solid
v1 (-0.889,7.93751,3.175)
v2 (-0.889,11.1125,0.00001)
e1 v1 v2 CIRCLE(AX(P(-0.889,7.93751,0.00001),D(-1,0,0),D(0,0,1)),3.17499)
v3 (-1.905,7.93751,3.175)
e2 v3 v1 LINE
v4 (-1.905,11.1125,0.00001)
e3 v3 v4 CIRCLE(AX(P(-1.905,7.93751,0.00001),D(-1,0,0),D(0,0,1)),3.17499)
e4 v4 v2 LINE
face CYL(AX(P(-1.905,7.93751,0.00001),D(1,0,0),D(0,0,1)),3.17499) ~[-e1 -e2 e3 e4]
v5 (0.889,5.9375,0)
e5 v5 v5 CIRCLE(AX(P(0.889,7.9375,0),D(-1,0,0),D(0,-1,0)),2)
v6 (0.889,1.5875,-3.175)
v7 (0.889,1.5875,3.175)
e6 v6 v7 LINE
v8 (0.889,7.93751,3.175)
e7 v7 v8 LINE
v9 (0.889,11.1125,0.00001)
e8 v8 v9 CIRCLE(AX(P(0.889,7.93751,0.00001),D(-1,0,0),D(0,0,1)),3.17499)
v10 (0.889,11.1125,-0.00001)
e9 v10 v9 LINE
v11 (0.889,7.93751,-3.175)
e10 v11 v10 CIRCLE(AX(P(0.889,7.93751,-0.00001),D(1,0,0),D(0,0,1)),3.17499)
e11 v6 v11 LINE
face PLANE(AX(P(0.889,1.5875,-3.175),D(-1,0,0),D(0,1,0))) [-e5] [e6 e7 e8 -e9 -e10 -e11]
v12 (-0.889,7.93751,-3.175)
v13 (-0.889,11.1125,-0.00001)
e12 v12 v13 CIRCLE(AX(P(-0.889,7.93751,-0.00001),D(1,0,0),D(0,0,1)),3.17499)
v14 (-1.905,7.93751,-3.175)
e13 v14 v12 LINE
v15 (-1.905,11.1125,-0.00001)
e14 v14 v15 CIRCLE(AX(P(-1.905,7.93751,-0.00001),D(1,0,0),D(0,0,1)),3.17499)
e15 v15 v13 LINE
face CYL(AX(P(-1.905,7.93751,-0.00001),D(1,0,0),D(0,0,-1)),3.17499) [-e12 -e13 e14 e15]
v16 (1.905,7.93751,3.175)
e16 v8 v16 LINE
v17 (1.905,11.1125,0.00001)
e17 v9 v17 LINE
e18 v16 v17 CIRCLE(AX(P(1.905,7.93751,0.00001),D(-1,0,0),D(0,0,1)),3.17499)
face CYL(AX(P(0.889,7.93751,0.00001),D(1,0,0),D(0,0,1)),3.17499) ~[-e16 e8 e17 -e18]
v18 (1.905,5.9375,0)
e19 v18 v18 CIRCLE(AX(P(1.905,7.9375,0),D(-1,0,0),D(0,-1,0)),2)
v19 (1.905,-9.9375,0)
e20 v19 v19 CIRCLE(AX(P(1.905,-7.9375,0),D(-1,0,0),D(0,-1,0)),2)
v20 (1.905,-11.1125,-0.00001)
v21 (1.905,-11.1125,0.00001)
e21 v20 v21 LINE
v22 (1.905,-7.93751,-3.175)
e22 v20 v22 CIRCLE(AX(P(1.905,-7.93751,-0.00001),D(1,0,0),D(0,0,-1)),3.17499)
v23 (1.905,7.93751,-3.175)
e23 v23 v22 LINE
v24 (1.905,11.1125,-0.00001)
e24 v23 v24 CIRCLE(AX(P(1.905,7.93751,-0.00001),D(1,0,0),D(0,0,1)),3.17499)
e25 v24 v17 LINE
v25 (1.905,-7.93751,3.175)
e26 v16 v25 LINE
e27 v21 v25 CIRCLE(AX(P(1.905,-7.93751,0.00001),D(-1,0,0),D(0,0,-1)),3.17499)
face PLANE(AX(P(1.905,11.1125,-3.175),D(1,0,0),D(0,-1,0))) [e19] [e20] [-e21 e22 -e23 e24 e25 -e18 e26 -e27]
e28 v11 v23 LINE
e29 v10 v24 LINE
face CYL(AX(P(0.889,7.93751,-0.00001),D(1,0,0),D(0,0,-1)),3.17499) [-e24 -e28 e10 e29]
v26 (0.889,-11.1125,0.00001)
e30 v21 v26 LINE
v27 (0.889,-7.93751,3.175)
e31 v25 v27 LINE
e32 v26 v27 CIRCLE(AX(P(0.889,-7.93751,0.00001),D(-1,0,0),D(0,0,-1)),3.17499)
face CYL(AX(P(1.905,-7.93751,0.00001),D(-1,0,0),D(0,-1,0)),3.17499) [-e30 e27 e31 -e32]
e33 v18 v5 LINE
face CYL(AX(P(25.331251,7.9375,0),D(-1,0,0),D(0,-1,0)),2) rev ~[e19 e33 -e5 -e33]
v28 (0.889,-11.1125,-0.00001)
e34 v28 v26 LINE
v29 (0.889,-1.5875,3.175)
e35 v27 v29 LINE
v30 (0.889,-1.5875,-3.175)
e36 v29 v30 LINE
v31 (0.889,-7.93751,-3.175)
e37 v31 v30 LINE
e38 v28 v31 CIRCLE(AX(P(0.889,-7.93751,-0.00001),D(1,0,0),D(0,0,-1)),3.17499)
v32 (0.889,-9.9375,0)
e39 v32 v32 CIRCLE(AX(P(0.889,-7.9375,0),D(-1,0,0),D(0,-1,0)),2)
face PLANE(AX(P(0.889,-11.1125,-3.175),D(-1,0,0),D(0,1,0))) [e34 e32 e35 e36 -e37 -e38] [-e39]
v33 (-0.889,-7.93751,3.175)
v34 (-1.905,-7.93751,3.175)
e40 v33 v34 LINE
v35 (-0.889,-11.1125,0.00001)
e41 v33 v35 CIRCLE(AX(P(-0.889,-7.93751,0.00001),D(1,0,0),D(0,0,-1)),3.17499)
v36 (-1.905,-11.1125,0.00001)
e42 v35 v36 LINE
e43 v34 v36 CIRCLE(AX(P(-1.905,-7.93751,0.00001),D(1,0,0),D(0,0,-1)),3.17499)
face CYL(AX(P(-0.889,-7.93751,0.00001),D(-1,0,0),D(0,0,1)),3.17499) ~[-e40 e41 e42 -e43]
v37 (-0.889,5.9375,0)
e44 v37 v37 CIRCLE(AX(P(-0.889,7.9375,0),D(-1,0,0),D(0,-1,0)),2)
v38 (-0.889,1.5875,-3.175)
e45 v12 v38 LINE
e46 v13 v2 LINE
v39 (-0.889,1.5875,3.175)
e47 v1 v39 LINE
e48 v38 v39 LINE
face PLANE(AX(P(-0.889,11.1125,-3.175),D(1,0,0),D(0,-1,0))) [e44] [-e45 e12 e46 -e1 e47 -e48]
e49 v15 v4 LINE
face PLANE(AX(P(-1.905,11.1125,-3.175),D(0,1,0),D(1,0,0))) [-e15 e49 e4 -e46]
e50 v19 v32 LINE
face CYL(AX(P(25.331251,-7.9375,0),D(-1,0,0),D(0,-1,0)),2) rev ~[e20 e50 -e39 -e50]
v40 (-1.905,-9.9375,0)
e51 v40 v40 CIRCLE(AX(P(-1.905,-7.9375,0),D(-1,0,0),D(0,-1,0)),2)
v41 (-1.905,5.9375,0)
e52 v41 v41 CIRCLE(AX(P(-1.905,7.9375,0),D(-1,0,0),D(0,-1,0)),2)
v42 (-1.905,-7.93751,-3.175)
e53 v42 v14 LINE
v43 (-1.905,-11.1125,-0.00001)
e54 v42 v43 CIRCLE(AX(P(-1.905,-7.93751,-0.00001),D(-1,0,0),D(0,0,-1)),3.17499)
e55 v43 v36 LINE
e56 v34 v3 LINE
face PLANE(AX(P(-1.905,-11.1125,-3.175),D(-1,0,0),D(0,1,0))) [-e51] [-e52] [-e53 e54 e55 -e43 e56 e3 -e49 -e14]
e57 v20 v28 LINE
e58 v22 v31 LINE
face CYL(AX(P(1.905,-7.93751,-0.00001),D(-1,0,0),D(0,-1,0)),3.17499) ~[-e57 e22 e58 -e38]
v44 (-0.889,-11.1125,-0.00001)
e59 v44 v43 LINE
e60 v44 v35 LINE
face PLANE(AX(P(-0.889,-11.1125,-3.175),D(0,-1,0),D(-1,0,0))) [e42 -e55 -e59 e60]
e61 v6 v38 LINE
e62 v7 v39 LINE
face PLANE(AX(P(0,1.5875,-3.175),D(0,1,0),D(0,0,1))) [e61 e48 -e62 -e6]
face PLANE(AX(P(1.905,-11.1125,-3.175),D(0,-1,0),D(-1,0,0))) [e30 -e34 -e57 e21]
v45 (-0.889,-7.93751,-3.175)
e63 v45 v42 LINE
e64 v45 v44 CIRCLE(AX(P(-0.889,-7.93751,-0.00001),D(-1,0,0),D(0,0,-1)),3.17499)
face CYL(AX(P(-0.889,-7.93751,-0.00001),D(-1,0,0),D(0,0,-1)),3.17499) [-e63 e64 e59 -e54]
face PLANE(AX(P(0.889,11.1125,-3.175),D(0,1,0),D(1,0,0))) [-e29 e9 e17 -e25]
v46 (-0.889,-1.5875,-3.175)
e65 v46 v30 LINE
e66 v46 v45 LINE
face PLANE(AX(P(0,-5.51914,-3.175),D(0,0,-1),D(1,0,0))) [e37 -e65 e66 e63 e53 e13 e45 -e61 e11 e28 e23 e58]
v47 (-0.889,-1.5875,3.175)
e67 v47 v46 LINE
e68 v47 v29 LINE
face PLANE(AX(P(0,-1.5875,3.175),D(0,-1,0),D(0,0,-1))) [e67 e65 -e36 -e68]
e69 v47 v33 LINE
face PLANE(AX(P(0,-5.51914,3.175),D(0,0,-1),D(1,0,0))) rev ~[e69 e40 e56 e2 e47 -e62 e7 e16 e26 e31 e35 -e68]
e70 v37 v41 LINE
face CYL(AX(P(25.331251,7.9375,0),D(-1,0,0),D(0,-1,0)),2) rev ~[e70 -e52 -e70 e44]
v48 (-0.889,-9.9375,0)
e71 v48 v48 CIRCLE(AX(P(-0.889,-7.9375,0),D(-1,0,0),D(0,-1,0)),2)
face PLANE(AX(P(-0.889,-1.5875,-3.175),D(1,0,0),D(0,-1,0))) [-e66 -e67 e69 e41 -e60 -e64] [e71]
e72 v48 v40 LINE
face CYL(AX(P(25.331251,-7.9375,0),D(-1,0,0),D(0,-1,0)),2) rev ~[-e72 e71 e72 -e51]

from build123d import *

# Parameters (mm, degrees)
F1_DEPTH   = 0.889
F3_DEPTH   = 6.35
F4_R       = 3.17499
F7_D       = 4
F7_ON_F6_D = 4


# Not quite as in the source:
# - a fillet or chamfer is up to 0.001 mm smaller than in the source, because OpenCascade refuses the exact size
# - a feature names something its author has since deleted; it is built from what else it names


with BuildPart() as f1:
    # F0 (on Right) → F1 (new body, symmetric)
    with BuildSketch(Plane.YZ):
        Polygon((1.5875, 3.175), (-1.5875, 3.175), (-1.5875, 0), (0, 0), (1.5875, 0), align=None)
        Polygon((0, 0), (-1.5875, 0), (-1.5875, -3.175), (1.5875, -3.175), (1.5875, 0), align=None)
    extrude(amount=F1_DEPTH, both=True)

    # F2 (on face) → F3 (join)
    with BuildSketch(Plane(origin=(0, 0, -3.175), x_dir=(1, 0, 0), z_dir=(0, 0, -1))):
        Polygon((0.889, 0), (1.905, 0), (1.905, 11.1125), (0.889, 11.1125), (0.889, 1.5875), (-0.889, 1.5875), (-0.889, 11.1125), (-1.905, 11.1125), (-1.905, 0), (-0.889, 0), (0, 0), align=None)
        Polygon((1.905, -11.1125), (1.905, 0), (0.889, 0), (0, 0), (-0.889, 0), (-1.905, 0), (-1.905, -11.1125), (-0.889, -11.1125), (-0.889, -1.5875), (0.889, -1.5875), (0.889, -11.1125), align=None)
    extrude(amount=-F3_DEPTH)

    # F4 (radius 3.175 in the source; OpenCascade refuses exactly that, so slightly less here)
    f4_edges = [f1.edges().sort_by_distance(p)[0] for p in [
        (1.397, -11.1125, 3.175),
        (-1.397, -11.1125, 3.175),
        (1.397, -11.1125, -3.175),
        (-1.397, -11.1125, -3.175),
        (-1.397, 11.1125, -3.175),
        (1.397, 11.1125, -3.175),
        (1.397, 11.1125, 3.175),
        (-1.397, 11.1125, 3.175),
    ]]
    fillet(f4_edges, radius=F4_R)

    # F7 (through all)
    with Locations(Plane.YZ.offset(1.905)):
        with Locations((-7.9375, 0)):
            Hole(F7_D / 2)

    # F7 on F6 (through all)
    with Locations(Plane.YZ.offset(1.905)):
        with Locations((7.9375, 0)):
            Hole(F7_ON_F6_D / 2)


solid = f1.part
